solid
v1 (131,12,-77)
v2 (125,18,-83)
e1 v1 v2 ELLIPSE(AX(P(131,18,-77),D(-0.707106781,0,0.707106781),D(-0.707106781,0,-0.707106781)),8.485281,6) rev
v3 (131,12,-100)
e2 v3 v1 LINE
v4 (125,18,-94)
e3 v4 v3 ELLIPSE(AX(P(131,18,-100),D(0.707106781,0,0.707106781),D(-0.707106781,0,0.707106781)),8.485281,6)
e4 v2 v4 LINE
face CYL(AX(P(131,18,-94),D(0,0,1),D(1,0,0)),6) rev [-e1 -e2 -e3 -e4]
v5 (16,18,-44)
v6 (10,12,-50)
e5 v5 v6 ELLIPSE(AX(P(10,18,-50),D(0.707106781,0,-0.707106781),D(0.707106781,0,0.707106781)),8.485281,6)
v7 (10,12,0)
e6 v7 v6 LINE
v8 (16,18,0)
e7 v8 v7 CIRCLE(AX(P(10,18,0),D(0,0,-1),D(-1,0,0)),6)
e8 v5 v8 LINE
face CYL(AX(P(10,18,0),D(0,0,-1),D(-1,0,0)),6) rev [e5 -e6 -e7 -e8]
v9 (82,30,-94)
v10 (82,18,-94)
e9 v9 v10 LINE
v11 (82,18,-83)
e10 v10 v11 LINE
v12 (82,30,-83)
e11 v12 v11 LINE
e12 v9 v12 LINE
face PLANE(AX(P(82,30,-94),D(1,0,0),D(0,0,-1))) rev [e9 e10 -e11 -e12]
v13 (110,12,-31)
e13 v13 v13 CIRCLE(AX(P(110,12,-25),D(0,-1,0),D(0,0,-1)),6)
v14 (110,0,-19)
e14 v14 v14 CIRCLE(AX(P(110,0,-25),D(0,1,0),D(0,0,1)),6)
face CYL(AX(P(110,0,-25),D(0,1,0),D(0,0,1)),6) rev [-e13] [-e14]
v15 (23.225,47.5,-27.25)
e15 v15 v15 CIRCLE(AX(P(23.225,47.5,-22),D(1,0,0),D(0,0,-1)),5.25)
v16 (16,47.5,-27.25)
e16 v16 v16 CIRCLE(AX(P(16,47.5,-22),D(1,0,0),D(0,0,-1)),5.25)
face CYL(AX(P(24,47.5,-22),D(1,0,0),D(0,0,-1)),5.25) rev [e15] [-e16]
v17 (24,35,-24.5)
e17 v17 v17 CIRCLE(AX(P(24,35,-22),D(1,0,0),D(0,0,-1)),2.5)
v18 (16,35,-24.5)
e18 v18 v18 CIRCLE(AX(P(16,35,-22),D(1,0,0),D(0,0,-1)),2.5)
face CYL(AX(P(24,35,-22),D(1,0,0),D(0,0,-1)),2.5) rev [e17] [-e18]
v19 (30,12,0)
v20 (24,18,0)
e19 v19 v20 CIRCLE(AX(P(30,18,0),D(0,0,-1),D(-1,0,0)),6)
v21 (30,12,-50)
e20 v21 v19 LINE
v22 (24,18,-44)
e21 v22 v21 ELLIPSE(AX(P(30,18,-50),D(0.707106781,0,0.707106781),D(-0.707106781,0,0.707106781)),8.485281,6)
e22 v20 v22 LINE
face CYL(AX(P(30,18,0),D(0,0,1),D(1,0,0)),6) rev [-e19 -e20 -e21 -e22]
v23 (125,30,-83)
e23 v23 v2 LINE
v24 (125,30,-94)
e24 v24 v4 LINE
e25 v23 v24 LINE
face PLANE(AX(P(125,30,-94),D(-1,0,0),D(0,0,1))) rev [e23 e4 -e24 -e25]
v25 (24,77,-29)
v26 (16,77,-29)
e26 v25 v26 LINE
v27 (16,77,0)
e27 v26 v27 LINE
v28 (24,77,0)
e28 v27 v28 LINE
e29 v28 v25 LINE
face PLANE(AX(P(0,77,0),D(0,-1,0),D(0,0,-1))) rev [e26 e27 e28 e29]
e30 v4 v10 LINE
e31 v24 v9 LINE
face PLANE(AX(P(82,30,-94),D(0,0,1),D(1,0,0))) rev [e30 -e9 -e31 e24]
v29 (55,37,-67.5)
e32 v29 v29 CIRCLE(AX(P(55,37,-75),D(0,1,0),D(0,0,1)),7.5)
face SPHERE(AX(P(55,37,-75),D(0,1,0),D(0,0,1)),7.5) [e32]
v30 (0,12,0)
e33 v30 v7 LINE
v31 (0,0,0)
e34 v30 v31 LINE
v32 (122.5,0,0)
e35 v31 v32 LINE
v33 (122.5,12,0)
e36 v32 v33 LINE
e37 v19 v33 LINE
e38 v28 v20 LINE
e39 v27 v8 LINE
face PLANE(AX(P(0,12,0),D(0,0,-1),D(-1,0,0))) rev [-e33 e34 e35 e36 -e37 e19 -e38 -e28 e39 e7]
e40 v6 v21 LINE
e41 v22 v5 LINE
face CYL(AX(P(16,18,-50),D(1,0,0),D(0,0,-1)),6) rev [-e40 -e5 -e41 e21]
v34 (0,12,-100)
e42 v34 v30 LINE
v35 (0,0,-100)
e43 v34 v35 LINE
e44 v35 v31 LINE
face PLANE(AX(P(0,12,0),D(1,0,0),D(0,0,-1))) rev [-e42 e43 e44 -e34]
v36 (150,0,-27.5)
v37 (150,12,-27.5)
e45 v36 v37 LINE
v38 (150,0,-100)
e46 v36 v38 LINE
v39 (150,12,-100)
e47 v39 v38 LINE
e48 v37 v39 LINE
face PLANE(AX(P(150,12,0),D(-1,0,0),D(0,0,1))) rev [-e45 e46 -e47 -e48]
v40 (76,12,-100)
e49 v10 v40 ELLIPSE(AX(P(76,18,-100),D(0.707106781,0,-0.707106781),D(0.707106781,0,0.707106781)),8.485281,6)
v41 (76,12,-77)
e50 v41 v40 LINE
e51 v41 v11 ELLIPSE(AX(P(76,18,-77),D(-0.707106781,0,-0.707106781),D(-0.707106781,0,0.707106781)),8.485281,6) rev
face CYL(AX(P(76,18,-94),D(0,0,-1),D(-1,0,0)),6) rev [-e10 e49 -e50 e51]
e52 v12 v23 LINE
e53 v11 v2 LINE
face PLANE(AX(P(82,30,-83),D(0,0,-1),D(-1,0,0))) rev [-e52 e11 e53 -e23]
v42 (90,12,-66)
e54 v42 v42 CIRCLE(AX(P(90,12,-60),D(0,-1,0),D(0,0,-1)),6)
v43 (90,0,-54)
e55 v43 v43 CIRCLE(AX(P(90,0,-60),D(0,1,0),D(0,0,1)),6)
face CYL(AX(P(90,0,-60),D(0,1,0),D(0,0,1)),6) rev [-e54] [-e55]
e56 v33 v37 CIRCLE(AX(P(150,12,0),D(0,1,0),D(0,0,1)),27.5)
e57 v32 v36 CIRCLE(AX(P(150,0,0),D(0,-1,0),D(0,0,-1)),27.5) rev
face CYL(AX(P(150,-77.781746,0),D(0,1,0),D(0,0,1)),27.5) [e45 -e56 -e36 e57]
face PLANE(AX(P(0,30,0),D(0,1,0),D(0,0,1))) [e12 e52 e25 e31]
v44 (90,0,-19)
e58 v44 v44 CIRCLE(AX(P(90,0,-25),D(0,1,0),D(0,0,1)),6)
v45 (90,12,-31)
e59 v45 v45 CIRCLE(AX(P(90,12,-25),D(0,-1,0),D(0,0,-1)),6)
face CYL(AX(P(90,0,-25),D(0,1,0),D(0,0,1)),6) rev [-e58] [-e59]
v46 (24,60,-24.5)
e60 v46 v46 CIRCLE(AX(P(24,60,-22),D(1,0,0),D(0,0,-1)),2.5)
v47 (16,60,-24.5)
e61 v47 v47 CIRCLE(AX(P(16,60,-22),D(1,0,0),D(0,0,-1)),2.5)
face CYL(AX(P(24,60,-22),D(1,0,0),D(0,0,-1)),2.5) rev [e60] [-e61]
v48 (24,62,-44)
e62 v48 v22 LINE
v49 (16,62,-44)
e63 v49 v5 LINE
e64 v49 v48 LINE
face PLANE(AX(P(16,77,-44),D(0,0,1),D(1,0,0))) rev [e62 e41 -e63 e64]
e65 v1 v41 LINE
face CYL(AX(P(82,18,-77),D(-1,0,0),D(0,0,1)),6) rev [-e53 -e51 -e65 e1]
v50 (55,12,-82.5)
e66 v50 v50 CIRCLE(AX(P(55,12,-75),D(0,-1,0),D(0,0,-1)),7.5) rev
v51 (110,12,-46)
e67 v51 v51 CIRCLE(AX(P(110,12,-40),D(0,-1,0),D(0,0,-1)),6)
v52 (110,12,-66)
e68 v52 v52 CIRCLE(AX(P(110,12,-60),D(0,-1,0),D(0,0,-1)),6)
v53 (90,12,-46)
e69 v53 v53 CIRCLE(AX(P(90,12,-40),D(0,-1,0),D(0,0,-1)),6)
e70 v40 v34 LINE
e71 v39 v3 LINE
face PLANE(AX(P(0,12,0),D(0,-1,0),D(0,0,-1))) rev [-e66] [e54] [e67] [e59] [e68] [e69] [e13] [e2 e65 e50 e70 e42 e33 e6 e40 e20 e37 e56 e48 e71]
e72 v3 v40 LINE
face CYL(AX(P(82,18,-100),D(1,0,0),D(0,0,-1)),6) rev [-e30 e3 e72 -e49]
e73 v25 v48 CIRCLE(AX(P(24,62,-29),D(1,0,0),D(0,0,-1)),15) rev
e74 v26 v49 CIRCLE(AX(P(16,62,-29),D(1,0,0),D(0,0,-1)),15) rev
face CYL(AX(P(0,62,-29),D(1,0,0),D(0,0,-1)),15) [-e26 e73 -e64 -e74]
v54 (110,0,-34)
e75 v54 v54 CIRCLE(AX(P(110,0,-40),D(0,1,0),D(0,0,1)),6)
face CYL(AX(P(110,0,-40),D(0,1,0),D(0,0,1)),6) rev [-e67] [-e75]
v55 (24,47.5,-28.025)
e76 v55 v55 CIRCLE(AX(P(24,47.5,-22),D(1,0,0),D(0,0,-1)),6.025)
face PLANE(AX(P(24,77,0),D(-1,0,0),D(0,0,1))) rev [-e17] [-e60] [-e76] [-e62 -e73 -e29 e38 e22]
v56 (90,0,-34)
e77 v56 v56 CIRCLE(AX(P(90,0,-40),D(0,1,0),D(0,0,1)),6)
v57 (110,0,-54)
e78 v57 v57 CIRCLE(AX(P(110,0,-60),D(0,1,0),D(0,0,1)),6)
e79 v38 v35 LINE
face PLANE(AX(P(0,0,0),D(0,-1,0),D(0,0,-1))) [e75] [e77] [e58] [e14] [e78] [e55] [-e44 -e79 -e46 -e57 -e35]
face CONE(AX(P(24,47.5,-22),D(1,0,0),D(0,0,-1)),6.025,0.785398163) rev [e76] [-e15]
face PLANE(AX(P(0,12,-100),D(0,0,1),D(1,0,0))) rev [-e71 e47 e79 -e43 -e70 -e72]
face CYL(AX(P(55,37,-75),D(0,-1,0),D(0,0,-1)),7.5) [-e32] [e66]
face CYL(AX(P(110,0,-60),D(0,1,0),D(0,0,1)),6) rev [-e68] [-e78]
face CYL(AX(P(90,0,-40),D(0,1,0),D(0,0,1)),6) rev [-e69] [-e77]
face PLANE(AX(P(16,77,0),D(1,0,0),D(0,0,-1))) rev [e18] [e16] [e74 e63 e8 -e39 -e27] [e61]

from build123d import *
from build123d.topology import SkipClean

# Parameters (mm, degrees)
SKETCH1_W                        = 150
SKETCH1_H                        = 100
BOSS_EXTRUDE1_DEPTH              = 12
SKETCH2_W                        = 8
SKETCH2_H                        = 44
BOSS_EXTRUDE2_DEPTH              = 65
FILLET1_R                        = 6
CUT_EXTRUDE1_DEPTH               = 179.339563754
F_5_0_5_DIAMETER_HOLE1_D         = 5
M12X1_5_TAPPED_HOLE1_D           = 10.5
M12X1_5_TAPPED_HOLE1_CSINK_D     = 12.05
M12X1_5_TAPPED_HOLE1_CSINK_ANGLE = 90
SKETCH8_R                        = 7.5
BOSS_EXTRUDE3_DEPTH              = 25
BOSS_EXTRUDE4_DEPTH              = 12
CUT_EXTRUDE2_DEPTH               = 214.848661441
CUT_EXTRUDE2_DEPTH_BACK          = 214.848661441
SKETCH10_R                       = 6
REVOLVE1_ANGLE                   = 180
SKETCH12_W                       = 43
SKETCH12_H                       = 11
BOSS_EXTRUDE5_DEPTH              = 18
FILLET2_R                        = 6


with BuildPart() as part:
    # Sketch1 → Boss-Extrude1 (new body)
    with BuildSketch(Plane(origin=(0, 0, 0), x_dir=(1, 0, 0), z_dir=(0, 1, 0))):
        with Locations((75, 50)):
            Rectangle(SKETCH1_W, SKETCH1_H)
    extrude(amount=BOSS_EXTRUDE1_DEPTH)

    # Sketch2 → Boss-Extrude2 (add)
    with BuildSketch(Plane(origin=(0, 12, 0), x_dir=(1, 0, 0), z_dir=(0, 1, 0))):
        with Locations((20, 22)):
            Rectangle(SKETCH2_W, SKETCH2_H)
    extrude(amount=BOSS_EXTRUDE2_DEPTH)

    # Fillet1
    fillet1_edges = [part.edges().sort_by_distance(p)[0] for p in [
        (16, 12, -22),
        (24, 12, -22),
        (20, 12, -44),
    ]]
    fillet(fillet1_edges, radius=FILLET1_R)

    # Sketch3 → Cut-Extrude1 (cut, through all)
    with BuildSketch(Plane(origin=(24, 0, 0), x_dir=(0, 0, -1), z_dir=(1, 0, 0))):
        with BuildLine():
            Line((44, 77), (29, 77))
            ThreePointArc((29, 77), (39.606601718, 72.606601718), (44, 62))
            Line((44, 62), (44, 77))
        make_face()
    extrude(amount=-CUT_EXTRUDE1_DEPTH, mode=Mode.SUBTRACT)

    # Ø5.0 (5) Diameter Hole1 (through all)
    with Locations(Plane(origin=(24, 0, 0), x_dir=(0, 0, -1), z_dir=(1, 0, 0))):
        with Locations((22, 60), (22, 35)):
            Hole(F_5_0_5_DIAMETER_HOLE1_D / 2)

    # M12x1.5 Tapped Hole1 (through all)
    with Locations(Plane(origin=(24, 0, 0), x_dir=(0, 0, -1), z_dir=(1, 0, 0))):
        with Locations((22, 47.5)):
            CounterSinkHole(M12X1_5_TAPPED_HOLE1_D / 2, M12X1_5_TAPPED_HOLE1_CSINK_D / 2, counter_sink_angle=M12X1_5_TAPPED_HOLE1_CSINK_ANGLE)

    # Sketch8 → Boss-Extrude3 (add)
    with BuildSketch(Plane(origin=(0, 12, 0), x_dir=(1, 0, 0), z_dir=(0, 1, 0))):
        with Locations(Location((55, 75, 0), (0, 0, 90))):
            Circle(SKETCH8_R)
    extrude(amount=BOSS_EXTRUDE3_DEPTH)

    # Sketch9 → Boss-Extrude4 (add)
    with BuildSketch(Plane(origin=(0, 12, 0), x_dir=(1, 0, 0), z_dir=(0, 1, 0))):
        with BuildLine():
            ThreePointArc((177.5, 0), (169.445436483, 19.445436483), (150, 27.5))
            Line((150, 27.5), (150, 0))
            Line((150, 0), (122.5, 0))
            ThreePointArc((122.5, 0), (150, -27.5), (177.5, 0))
        make_face()
        with BuildLine():
            Line((150, 0), (150, 27.5))
            ThreePointArc((150, 27.5), (130.554563517, 19.445436483), (122.5, 0))
            Line((122.5, 0), (150, 0))
        make_face()
    extrude(amount=-BOSS_EXTRUDE4_DEPTH)

    # Sketch10 → Cut-Extrude2 (cut, two sides: drawn at the far end of the back side and taken through both)
    with BuildSketch(Plane(origin=(0, 12, 0), x_dir=(1, 0, 0), z_dir=(0, 1, 0)).offset(-CUT_EXTRUDE2_DEPTH_BACK)):
        with Locations(Location((90, 60, 0), (0, 0, 270))):
            Circle(SKETCH10_R)
        with Locations(Location((110, 60, 0), (0, 0, 270))):
            Circle(SKETCH10_R)
        with Locations(Location((90, 40, 0), (0, 0, 270))):
            Circle(SKETCH10_R)
        with Locations(Location((110, 40, 0), (0, 0, 270))):
            Circle(SKETCH10_R)
        with Locations(Location((90, 25, 0), (0, 0, 270))):
            Circle(SKETCH10_R)
        with Locations(Location((110, 25, 0), (0, 0, 270))):
            Circle(SKETCH10_R)
    extrude(amount=CUT_EXTRUDE2_DEPTH + CUT_EXTRUDE2_DEPTH_BACK, mode=Mode.SUBTRACT)

    # Sketch11 → Revolve1 (revolve)
    with SkipClean():  # the faces are left unmerged after this step: merging them gives an invalid solid
        with BuildSketch(Plane(origin=(0, 37, 0), x_dir=(1, 0, 0), z_dir=(0, 1, 0))):
            with BuildLine():
                ThreePointArc((62.5, 75), (60.303300859, 80.303300859), (55, 82.5))
                Line((55, 82.5), (55, 67.5))
                ThreePointArc((55, 67.5), (60.303300859, 69.696699141), (62.5, 75))
            make_face()
            with BuildLine():
                Line((55, 67.5), (55, 82.5))
                ThreePointArc((55, 82.5), (47.5, 75), (55, 67.5))
            make_face()
        revolve(axis=Axis((55, 37, -82.5), (0, 0, 1)), revolution_arc=REVOLVE1_ANGLE)

    # Sketch12 → Boss-Extrude5 (add)
    with BuildSketch(Plane(origin=(0, 12, 0), x_dir=(1, 0, 0), z_dir=(0, 1, 0))):
        with Locations((103.5, 88.5)):
            Rectangle(SKETCH12_W, SKETCH12_H)
    extrude(amount=BOSS_EXTRUDE5_DEPTH)

    # Fillet2
    fillet2_edges = [part.edges().sort_by_distance(p)[0] for p in [
        (82, 12, -88.5),
        (103.5, 12, -83),
        (125, 12, -88.5),
        (103.5, 12, -94),
    ]]
    fillet(fillet2_edges, radius=FILLET2_R - 0.0001)  # a hair under: the kernel refuses the full size


solid = part.part
